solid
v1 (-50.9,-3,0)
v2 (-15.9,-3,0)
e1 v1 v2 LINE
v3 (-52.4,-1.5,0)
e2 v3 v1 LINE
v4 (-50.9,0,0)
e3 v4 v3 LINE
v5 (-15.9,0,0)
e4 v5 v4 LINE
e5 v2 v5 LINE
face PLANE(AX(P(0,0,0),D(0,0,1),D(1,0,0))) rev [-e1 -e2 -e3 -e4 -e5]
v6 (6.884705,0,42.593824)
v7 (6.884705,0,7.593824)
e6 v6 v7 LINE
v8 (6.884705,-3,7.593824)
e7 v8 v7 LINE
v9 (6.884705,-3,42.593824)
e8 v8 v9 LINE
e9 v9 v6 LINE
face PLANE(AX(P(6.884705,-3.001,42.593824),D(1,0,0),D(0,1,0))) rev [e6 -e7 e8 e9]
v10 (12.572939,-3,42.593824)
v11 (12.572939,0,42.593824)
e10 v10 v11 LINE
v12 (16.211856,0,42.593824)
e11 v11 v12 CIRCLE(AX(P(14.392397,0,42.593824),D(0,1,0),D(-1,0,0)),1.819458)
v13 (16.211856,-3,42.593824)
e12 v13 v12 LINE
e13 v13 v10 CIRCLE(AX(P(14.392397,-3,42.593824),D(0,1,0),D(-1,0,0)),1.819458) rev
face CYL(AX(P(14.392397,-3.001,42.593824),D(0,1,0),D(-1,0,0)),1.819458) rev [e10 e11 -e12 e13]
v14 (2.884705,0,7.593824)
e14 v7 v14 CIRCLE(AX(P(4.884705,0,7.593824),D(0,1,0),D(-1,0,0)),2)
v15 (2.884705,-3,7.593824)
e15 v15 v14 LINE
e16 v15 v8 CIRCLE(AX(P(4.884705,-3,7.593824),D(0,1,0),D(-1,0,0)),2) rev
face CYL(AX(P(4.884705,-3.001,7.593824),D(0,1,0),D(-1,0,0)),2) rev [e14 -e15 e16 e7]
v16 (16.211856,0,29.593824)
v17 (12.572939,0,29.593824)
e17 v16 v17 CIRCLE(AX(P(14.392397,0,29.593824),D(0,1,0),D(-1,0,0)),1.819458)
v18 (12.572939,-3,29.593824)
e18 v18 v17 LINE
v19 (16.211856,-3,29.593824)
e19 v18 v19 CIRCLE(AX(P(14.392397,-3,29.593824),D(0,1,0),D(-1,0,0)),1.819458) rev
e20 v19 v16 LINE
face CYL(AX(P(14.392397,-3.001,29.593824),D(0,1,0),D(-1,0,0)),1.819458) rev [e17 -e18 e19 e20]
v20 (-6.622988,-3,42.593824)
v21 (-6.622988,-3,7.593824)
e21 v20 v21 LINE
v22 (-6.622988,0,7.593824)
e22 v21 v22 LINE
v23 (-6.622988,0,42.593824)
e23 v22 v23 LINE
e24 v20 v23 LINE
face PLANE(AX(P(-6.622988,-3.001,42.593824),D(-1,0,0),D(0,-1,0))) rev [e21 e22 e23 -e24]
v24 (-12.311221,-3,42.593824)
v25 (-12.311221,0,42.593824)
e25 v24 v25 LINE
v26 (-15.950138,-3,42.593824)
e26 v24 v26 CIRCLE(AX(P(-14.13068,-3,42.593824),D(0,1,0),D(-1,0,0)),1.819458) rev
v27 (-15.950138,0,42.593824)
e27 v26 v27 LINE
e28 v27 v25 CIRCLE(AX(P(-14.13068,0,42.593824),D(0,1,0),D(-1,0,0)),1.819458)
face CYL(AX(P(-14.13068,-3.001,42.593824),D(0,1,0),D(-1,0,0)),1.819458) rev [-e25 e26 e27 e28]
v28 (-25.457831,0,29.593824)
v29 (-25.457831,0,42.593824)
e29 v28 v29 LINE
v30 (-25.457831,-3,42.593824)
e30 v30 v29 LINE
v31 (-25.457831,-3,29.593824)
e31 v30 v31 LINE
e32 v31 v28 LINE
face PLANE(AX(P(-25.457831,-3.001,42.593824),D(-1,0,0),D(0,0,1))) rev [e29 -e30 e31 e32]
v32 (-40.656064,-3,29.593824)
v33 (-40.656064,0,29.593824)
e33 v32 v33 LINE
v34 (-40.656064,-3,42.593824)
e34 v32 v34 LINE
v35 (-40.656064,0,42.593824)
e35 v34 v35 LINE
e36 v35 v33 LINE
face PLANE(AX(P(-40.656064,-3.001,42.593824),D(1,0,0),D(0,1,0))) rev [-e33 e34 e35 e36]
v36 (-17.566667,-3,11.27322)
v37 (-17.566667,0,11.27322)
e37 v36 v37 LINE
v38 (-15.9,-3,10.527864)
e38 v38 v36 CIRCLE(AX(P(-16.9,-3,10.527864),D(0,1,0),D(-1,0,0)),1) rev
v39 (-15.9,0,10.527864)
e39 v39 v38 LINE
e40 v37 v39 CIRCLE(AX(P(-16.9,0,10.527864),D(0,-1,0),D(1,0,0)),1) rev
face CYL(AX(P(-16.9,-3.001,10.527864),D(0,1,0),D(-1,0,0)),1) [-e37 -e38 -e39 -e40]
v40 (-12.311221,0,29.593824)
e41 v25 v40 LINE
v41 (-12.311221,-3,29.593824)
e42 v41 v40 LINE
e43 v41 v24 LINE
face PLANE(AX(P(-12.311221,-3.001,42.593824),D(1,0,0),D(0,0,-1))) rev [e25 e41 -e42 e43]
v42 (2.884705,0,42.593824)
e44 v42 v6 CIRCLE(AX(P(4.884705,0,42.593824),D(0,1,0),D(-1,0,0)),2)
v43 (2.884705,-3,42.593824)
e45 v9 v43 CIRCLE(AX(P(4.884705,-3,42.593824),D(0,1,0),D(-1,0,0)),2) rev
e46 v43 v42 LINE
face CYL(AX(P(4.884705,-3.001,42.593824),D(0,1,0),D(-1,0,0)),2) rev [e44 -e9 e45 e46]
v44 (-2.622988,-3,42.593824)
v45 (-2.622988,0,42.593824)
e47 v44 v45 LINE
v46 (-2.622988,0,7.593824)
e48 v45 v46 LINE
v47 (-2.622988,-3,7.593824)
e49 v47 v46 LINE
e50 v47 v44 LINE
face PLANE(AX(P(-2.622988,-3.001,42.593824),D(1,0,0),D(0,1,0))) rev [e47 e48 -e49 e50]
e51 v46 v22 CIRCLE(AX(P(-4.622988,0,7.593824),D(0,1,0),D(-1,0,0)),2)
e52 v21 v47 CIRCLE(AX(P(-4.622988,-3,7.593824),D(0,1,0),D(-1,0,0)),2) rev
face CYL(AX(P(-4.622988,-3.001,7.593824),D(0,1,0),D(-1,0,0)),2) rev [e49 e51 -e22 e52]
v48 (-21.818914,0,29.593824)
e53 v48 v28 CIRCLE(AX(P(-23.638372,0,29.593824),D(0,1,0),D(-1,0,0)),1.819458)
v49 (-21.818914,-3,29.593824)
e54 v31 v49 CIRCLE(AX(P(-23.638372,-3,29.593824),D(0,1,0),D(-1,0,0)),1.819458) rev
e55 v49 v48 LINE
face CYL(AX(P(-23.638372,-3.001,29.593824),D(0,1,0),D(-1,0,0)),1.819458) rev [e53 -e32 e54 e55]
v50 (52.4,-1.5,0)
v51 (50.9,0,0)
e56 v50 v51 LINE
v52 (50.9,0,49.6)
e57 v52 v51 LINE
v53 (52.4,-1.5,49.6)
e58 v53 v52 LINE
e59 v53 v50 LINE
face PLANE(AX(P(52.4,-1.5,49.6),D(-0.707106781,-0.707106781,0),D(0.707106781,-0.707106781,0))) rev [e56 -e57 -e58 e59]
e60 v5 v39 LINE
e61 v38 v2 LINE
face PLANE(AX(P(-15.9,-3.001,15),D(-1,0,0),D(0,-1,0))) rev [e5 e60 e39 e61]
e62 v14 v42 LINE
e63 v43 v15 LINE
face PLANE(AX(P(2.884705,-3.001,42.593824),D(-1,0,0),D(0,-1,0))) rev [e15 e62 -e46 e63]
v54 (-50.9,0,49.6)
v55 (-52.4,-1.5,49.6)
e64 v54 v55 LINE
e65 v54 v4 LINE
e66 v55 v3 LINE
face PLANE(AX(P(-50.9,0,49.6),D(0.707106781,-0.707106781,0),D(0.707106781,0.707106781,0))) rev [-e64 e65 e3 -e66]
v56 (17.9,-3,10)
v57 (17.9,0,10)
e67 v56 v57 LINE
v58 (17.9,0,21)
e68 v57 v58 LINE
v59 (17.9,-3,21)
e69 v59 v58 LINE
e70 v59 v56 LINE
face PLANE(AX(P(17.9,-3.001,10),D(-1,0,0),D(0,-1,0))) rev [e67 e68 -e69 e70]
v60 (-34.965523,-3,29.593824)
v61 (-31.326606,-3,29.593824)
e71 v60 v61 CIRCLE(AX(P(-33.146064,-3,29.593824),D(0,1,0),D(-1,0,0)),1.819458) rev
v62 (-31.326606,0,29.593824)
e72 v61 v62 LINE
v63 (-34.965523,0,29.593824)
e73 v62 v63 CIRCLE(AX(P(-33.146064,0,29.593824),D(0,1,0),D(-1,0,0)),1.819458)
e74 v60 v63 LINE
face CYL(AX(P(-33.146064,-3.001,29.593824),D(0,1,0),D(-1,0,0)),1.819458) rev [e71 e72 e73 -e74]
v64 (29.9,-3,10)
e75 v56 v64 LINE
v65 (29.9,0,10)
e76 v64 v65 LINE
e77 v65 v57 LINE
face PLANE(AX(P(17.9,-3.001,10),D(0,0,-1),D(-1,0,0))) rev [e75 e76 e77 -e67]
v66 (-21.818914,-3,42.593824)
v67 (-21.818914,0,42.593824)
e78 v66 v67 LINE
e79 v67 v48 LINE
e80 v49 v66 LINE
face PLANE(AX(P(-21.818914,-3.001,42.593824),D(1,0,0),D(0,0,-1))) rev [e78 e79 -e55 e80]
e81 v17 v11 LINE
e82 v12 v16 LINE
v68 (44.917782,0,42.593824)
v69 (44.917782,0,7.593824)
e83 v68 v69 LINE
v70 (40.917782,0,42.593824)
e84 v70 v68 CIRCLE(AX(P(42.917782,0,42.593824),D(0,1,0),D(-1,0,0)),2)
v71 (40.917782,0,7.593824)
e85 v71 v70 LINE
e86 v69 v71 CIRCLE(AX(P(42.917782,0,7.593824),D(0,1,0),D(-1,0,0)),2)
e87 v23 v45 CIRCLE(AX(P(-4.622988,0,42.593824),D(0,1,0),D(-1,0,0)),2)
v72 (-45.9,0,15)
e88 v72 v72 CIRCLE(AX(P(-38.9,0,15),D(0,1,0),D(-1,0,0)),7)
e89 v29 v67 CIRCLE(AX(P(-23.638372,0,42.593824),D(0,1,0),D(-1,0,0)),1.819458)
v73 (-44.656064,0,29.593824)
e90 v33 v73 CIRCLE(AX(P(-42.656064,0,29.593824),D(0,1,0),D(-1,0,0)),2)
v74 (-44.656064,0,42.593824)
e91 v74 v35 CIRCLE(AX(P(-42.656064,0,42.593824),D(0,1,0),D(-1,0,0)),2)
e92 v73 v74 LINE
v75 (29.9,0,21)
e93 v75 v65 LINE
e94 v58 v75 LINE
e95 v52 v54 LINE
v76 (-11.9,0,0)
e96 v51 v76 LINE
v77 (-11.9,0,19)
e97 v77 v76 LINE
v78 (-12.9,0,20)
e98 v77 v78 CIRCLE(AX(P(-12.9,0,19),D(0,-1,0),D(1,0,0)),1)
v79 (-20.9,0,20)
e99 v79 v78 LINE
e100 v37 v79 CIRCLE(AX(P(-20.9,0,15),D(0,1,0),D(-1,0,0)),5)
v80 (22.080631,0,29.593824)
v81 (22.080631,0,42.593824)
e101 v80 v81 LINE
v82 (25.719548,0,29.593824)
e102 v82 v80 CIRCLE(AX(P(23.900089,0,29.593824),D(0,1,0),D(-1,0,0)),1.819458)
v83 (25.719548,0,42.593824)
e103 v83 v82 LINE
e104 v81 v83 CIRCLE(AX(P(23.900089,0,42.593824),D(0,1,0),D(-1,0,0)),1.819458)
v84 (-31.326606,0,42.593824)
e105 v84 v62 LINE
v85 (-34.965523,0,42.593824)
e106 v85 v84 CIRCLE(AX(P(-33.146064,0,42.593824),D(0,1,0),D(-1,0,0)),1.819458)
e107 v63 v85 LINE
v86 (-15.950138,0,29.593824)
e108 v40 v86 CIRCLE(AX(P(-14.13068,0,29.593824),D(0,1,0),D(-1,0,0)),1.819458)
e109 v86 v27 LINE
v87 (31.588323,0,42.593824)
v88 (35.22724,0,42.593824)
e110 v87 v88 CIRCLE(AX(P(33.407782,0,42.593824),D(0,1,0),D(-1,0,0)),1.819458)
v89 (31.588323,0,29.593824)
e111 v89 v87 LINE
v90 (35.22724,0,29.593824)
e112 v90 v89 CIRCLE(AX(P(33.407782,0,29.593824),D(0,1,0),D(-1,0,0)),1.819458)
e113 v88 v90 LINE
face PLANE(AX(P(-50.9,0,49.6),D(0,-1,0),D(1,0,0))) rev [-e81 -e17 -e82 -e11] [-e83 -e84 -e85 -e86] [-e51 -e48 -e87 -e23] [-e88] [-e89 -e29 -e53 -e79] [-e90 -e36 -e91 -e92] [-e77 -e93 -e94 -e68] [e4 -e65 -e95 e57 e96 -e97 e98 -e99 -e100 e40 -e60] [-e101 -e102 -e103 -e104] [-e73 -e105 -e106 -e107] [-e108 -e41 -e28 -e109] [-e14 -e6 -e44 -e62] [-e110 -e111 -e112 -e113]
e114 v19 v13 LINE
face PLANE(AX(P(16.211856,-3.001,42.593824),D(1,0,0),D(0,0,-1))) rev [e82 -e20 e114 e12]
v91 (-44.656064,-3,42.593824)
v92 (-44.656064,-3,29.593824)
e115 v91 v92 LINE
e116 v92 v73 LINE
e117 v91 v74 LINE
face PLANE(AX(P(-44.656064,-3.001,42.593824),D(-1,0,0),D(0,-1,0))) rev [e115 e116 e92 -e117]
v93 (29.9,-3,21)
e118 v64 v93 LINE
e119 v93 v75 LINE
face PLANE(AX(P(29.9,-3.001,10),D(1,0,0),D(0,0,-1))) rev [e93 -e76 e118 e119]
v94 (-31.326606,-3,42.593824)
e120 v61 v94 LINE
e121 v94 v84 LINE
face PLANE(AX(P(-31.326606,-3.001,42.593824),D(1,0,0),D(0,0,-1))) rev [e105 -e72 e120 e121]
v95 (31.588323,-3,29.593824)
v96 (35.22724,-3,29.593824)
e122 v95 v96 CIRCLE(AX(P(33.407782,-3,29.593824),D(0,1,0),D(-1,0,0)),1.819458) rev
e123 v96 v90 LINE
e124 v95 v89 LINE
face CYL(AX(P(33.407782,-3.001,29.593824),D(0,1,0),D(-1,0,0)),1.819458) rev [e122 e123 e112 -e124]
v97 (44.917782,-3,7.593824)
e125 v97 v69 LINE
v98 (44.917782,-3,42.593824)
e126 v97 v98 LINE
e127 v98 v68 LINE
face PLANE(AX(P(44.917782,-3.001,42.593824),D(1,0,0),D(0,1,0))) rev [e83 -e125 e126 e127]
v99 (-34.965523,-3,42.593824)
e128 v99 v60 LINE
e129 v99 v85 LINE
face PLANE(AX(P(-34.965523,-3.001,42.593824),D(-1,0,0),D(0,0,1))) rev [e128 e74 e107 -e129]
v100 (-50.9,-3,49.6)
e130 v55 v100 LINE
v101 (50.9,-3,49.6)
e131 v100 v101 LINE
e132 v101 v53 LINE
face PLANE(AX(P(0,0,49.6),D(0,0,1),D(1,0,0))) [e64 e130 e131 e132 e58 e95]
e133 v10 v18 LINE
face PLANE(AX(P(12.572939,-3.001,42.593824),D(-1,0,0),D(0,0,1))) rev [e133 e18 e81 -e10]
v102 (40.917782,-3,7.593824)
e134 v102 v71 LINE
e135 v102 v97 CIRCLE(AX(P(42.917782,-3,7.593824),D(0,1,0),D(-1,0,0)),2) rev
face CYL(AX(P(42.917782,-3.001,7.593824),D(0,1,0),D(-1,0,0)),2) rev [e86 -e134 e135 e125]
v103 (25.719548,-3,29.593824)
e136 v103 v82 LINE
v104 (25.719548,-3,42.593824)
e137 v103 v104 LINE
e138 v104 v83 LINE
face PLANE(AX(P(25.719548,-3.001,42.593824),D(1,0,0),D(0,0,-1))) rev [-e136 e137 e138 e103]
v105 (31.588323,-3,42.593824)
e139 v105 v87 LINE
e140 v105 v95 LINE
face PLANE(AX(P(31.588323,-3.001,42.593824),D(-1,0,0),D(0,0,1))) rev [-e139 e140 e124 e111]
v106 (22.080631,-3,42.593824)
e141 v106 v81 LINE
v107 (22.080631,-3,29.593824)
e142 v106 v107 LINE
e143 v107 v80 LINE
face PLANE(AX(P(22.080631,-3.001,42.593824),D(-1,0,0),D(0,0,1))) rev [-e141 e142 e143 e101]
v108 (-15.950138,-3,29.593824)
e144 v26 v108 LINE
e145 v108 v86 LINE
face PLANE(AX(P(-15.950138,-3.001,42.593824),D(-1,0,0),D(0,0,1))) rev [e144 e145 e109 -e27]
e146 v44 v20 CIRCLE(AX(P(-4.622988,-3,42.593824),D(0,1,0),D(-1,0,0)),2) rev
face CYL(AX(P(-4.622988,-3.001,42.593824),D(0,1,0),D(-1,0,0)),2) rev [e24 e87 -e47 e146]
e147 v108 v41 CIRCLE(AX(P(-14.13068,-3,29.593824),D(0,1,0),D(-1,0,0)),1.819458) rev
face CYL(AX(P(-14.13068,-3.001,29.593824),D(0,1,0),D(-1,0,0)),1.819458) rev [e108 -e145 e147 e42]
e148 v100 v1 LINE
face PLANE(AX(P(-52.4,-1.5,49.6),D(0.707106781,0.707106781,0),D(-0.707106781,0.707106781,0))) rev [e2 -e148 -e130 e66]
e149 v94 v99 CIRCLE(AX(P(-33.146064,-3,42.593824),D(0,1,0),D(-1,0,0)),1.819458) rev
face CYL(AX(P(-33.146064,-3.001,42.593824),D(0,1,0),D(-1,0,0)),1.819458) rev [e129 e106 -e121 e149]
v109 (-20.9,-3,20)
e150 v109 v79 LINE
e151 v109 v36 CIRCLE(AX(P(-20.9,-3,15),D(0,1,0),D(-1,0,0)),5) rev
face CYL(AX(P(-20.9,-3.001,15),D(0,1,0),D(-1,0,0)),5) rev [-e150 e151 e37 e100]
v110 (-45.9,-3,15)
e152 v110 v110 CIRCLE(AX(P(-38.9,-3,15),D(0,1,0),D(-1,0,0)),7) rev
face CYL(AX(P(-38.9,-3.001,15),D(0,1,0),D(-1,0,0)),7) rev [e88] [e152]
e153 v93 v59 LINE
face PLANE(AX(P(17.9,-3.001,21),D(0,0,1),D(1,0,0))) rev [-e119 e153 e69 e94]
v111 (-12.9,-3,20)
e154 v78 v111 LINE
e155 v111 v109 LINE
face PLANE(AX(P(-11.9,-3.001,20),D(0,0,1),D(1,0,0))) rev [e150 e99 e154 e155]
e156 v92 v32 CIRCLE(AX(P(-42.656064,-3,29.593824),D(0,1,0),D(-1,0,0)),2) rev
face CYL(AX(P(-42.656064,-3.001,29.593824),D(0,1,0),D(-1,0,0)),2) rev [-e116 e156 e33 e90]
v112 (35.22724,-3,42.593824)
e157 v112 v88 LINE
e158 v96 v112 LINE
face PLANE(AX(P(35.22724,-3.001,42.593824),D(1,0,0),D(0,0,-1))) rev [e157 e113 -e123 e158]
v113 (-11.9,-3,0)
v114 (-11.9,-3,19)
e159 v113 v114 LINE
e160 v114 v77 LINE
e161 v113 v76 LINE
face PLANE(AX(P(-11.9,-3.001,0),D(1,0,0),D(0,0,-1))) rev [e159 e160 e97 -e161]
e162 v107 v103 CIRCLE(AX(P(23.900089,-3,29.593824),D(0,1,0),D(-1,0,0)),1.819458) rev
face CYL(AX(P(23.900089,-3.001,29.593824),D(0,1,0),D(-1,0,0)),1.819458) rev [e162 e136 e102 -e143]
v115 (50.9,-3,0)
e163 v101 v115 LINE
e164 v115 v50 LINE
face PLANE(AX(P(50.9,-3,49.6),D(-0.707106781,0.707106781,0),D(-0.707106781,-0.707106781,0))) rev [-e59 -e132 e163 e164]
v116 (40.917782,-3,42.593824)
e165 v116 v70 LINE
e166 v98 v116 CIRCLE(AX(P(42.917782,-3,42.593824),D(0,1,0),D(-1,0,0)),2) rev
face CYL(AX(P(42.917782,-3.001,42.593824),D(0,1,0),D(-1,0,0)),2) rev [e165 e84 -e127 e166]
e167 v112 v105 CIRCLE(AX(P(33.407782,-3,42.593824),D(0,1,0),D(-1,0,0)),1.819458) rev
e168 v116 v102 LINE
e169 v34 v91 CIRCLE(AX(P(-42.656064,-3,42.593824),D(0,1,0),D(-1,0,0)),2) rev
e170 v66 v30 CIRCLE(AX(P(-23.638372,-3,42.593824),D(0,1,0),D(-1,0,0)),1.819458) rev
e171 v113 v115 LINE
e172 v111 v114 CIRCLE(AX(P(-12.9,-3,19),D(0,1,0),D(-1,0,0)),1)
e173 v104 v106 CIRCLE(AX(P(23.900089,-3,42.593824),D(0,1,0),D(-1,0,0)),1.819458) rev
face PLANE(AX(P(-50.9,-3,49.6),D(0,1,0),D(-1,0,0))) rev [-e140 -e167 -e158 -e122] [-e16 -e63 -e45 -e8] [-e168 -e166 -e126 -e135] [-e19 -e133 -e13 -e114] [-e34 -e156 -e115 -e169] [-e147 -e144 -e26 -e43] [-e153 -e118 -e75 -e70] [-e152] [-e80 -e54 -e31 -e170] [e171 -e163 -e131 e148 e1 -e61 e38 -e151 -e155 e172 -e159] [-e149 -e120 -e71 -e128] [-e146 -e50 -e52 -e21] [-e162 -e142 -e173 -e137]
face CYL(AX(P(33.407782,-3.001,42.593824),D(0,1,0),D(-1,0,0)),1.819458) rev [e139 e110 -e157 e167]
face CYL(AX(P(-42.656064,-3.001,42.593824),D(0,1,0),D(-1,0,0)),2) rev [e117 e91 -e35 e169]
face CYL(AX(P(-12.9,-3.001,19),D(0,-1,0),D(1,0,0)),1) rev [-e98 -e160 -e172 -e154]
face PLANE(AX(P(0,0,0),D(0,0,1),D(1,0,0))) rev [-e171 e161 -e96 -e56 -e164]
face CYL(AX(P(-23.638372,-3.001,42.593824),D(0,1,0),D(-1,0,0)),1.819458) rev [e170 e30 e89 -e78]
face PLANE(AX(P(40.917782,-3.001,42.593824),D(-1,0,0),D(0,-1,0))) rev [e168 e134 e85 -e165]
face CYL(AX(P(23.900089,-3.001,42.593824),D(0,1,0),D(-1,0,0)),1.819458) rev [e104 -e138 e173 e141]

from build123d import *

# Parameters (mm, degrees)
BOSS_EXTRUDE1_DEPTH = 49.6
CUT_EXTRUDE1_REACH  = 74.214
SKETCH5_R           = 7
SKETCH5_W           = 12
SKETCH5_H           = 11
FILLET1_R           = 1


with BuildPart() as part:
    # Sketch4 → Boss-Extrude1 (new body)
    with BuildSketch(Plane.XY):
        Polygon((-50.9, 0), (50.9, 0), (52.4, -1.5), (50.9, -3), (-50.9, -3), (-52.4, -1.5), align=None)
    extrude(amount=BOSS_EXTRUDE1_DEPTH)

    # Sketch5 → Cut-Extrude1 (cut, up to next)
    with BuildSketch(Plane(origin=(0, 0, 0), x_dir=(1, 0, 0), z_dir=(0, 1, 0)), mode=Mode.PRIVATE) as cut_extrude1_sk1:
        with Locations((-38.9, -15)):
            Circle(SKETCH5_R)
    cut_extrude1_tool1 = extrude(cut_extrude1_sk1.sketch, amount=-CUT_EXTRUDE1_REACH, mode=Mode.PRIVATE) & part.part
    # Sketch5 → Cut-Extrude1 (cut, up to next)
    with BuildSketch(Plane(origin=(0, 0, 0), x_dir=(1, 0, 0), z_dir=(0, 1, 0)), mode=Mode.PRIVATE) as cut_extrude1_sk2:
        with Locations((23.9, -15.5)):
            Rectangle(SKETCH5_W, SKETCH5_H)
    cut_extrude1_tool2 = extrude(cut_extrude1_sk2.sketch, amount=-CUT_EXTRUDE1_REACH, mode=Mode.PRIVATE) & part.part
    # Sketch5 → Cut-Extrude1 (cut, up to next)
    with BuildSketch(Plane(origin=(0, 0, 0), x_dir=(1, 0, 0), z_dir=(0, 1, 0)), mode=Mode.PRIVATE) as cut_extrude1_sk3:
        with BuildLine():
            Line((-15.9, -15), (-15.9, 0))
            Line((-15.9, 0), (-11.9, 0))
            Line((-11.9, 0), (-11.9, -20))
            Line((-11.9, -20), (-20.9, -20))
            ThreePointArc((-20.9, -20), (-24.435533906, -11.464466094), (-15.9, -15))
        make_face()
    cut_extrude1_tool3 = extrude(cut_extrude1_sk3.sketch, amount=-CUT_EXTRUDE1_REACH, mode=Mode.PRIVATE) & part.part
    # Sketch5 → Cut-Extrude1 (cut, up to next)
    with BuildSketch(Plane(origin=(0, 0, 0), x_dir=(1, 0, 0), z_dir=(0, 1, 0)), mode=Mode.PRIVATE) as cut_extrude1_sk4:
        with BuildLine():
            Line((-44.656064428, -42.593823795), (-44.656064428, -29.593823795))
            ThreePointArc((-44.656064428, -29.593823795), (-42.656064428, -27.593823795), (-40.656064428, -29.593823795))
            Line((-40.656064428, -29.593823795), (-40.656064428, -42.593823795))
            ThreePointArc((-40.656064428, -42.593823795), (-42.656064428, -44.593823795), (-44.656064428, -42.593823795))
        make_face()
    cut_extrude1_tool4 = extrude(cut_extrude1_sk4.sketch, amount=-CUT_EXTRUDE1_REACH, mode=Mode.PRIVATE) & part.part
    # Sketch5 → Cut-Extrude1 (cut, up to next)
    with BuildSketch(Plane(origin=(0, 0, 0), x_dir=(1, 0, 0), z_dir=(0, 1, 0)), mode=Mode.PRIVATE) as cut_extrude1_sk5:
        with BuildLine():
            Line((40.917781725, -42.593823795), (40.917781725, -7.593823795))
            ThreePointArc((40.917781725, -7.593823795), (42.917781725, -5.593823795), (44.917781725, -7.593823795))
            Line((44.917781725, -7.593823795), (44.917781725, -42.593823795))
            ThreePointArc((44.917781725, -42.593823795), (42.917781725, -44.593823795), (40.917781725, -42.593823795))
        make_face()
    cut_extrude1_tool5 = extrude(cut_extrude1_sk5.sketch, amount=-CUT_EXTRUDE1_REACH, mode=Mode.PRIVATE) & part.part
    # Sketch5 → Cut-Extrude1 (cut, up to next)
    with BuildSketch(Plane(origin=(0, 0, 0), x_dir=(1, 0, 0), z_dir=(0, 1, 0)), mode=Mode.PRIVATE) as cut_extrude1_sk6:
        with BuildLine():
            Line((-34.965522839, -42.593823795), (-34.965522839, -29.593823795))
            ThreePointArc((-34.965522839, -29.593823795), (-33.146064428, -27.774365385), (-31.326606018, -29.593823795))
            Line((-31.326606018, -29.593823795), (-31.326606018, -42.593823795))
            ThreePointArc((-31.326606018, -42.593823795), (-33.146064428, -44.413282206), (-34.965522839, -42.593823795))
        make_face()
    cut_extrude1_tool6 = extrude(cut_extrude1_sk6.sketch, amount=-CUT_EXTRUDE1_REACH, mode=Mode.PRIVATE) & part.part
    # Sketch5 → Cut-Extrude1 (cut, up to next)
    with BuildSketch(Plane(origin=(0, 0, 0), x_dir=(1, 0, 0), z_dir=(0, 1, 0)), mode=Mode.PRIVATE) as cut_extrude1_sk7:
        with BuildLine():
            Line((-25.457830531, -42.593823795), (-25.457830531, -29.593823795))
            ThreePointArc((-25.457830531, -29.593823795), (-23.638372121, -27.774365385), (-21.81891371, -29.593823795))
            Line((-21.81891371, -29.593823795), (-21.81891371, -42.593823795))
            ThreePointArc((-21.81891371, -42.593823795), (-23.638372121, -44.413282206), (-25.457830531, -42.593823795))
        make_face()
    cut_extrude1_tool7 = extrude(cut_extrude1_sk7.sketch, amount=-CUT_EXTRUDE1_REACH, mode=Mode.PRIVATE) & part.part
    # Sketch5 → Cut-Extrude1 (cut, up to next)
    with BuildSketch(Plane(origin=(0, 0, 0), x_dir=(1, 0, 0), z_dir=(0, 1, 0)), mode=Mode.PRIVATE) as cut_extrude1_sk8:
        with BuildLine():
            Line((-15.950138223, -42.593823795), (-15.950138223, -29.593823795))
            ThreePointArc((-15.950138223, -29.593823795), (-14.130679813, -27.774365385), (-12.311221403, -29.593823795))
            Line((-12.311221403, -29.593823795), (-12.311221403, -42.593823795))
            ThreePointArc((-12.311221403, -42.593823795), (-14.130679813, -44.413282206), (-15.950138223, -42.593823795))
        make_face()
    cut_extrude1_tool8 = extrude(cut_extrude1_sk8.sketch, amount=-CUT_EXTRUDE1_REACH, mode=Mode.PRIVATE) & part.part
    # Sketch5 → Cut-Extrude1 (cut, up to next)
    with BuildSketch(Plane(origin=(0, 0, 0), x_dir=(1, 0, 0), z_dir=(0, 1, 0)), mode=Mode.PRIVATE) as cut_extrude1_sk9:
        with BuildLine():
            Line((-6.622987505, -42.593823795), (-6.622987505, -7.593823795))
            ThreePointArc((-6.622987505, -7.593823795), (-4.622987505, -5.593823795), (-2.622987505, -7.593823795))
            Line((-2.622987505, -7.593823795), (-2.622987505, -42.593823795))
            ThreePointArc((-2.622987505, -42.593823795), (-4.622987505, -44.593823795), (-6.622987505, -42.593823795))
        make_face()
    cut_extrude1_tool9 = extrude(cut_extrude1_sk9.sketch, amount=-CUT_EXTRUDE1_REACH, mode=Mode.PRIVATE) & part.part
    # Sketch5 → Cut-Extrude1 (cut, up to next)
    with BuildSketch(Plane(origin=(0, 0, 0), x_dir=(1, 0, 0), z_dir=(0, 1, 0)), mode=Mode.PRIVATE) as cut_extrude1_sk10:
        with BuildLine():
            Line((2.884704802, -42.593823795), (2.884704802, -7.593823795))
            ThreePointArc((2.884704802, -7.593823795), (4.884704802, -5.593823795), (6.884704802, -7.593823795))
            Line((6.884704802, -7.593823795), (6.884704802, -42.593823795))
            ThreePointArc((6.884704802, -42.593823795), (4.884704802, -44.593823795), (2.884704802, -42.593823795))
        make_face()
    cut_extrude1_tool10 = extrude(cut_extrude1_sk10.sketch, amount=-CUT_EXTRUDE1_REACH, mode=Mode.PRIVATE) & part.part
    # Sketch5 → Cut-Extrude1 (cut, up to next)
    with BuildSketch(Plane(origin=(0, 0, 0), x_dir=(1, 0, 0), z_dir=(0, 1, 0)), mode=Mode.PRIVATE) as cut_extrude1_sk11:
        with BuildLine():
            Line((12.5729387, -42.593823795), (12.5729387, -29.593823795))
            ThreePointArc((12.5729387, -29.593823795), (14.39239711, -27.774365385), (16.211855521, -29.593823795))
            Line((16.211855521, -29.593823795), (16.211855521, -42.593823795))
            ThreePointArc((16.211855521, -42.593823795), (14.39239711, -44.413282206), (12.5729387, -42.593823795))
        make_face()
    cut_extrude1_tool11 = extrude(cut_extrude1_sk11.sketch, amount=-CUT_EXTRUDE1_REACH, mode=Mode.PRIVATE) & part.part
    # Sketch5 → Cut-Extrude1 (cut, up to next)
    with BuildSketch(Plane(origin=(0, 0, 0), x_dir=(1, 0, 0), z_dir=(0, 1, 0)), mode=Mode.PRIVATE) as cut_extrude1_sk12:
        with BuildLine():
            Line((22.080631007, -42.593823795), (22.080631007, -29.593823795))
            ThreePointArc((22.080631007, -29.593823795), (23.900089418, -27.774365385), (25.719547828, -29.593823795))
            Line((25.719547828, -29.593823795), (25.719547828, -42.593823795))
            ThreePointArc((25.719547828, -42.593823795), (23.900089418, -44.413282206), (22.080631007, -42.593823795))
        make_face()
    cut_extrude1_tool12 = extrude(cut_extrude1_sk12.sketch, amount=-CUT_EXTRUDE1_REACH, mode=Mode.PRIVATE) & part.part
    # Sketch5 → Cut-Extrude1 (cut, up to next)
    with BuildSketch(Plane(origin=(0, 0, 0), x_dir=(1, 0, 0), z_dir=(0, 1, 0)), mode=Mode.PRIVATE) as cut_extrude1_sk13:
        with BuildLine():
            Line((31.588323315, -42.593823795), (31.588323315, -29.593823795))
            ThreePointArc((31.588323315, -29.593823795), (33.407781725, -27.774365385), (35.227240136, -29.593823795))
            Line((35.227240136, -29.593823795), (35.227240136, -42.593823795))
            ThreePointArc((35.227240136, -42.593823795), (33.407781725, -44.413282206), (31.588323315, -42.593823795))
        make_face()
    cut_extrude1_tool13 = extrude(cut_extrude1_sk13.sketch, amount=-CUT_EXTRUDE1_REACH, mode=Mode.PRIVATE) & part.part
    add(cut_extrude1_tool1.solids().sort_by_distance((-38.9, 0, 15))[0], mode=Mode.SUBTRACT)
    add(cut_extrude1_tool2.solids().sort_by_distance((23.9, 0, 15.5))[0], mode=Mode.SUBTRACT)
    add(cut_extrude1_tool3.solids().sort_by_distance((-17.356278, 0, 12.686666))[0], mode=Mode.SUBTRACT)
    add(cut_extrude1_tool4.solids().sort_by_distance((-42.656064, 0, 36.093824))[0], mode=Mode.SUBTRACT)
    add(cut_extrude1_tool5.solids().sort_by_distance((42.917782, 0, 25.093824))[0], mode=Mode.SUBTRACT)
    add(cut_extrude1_tool6.solids().sort_by_distance((-33.146064, 0, 36.093824))[0], mode=Mode.SUBTRACT)
    add(cut_extrude1_tool7.solids().sort_by_distance((-23.638372, 0, 36.093824))[0], mode=Mode.SUBTRACT)
    add(cut_extrude1_tool8.solids().sort_by_distance((-14.13068, 0, 36.093824))[0], mode=Mode.SUBTRACT)
    add(cut_extrude1_tool9.solids().sort_by_distance((-4.622988, 0, 25.093824))[0], mode=Mode.SUBTRACT)
    add(cut_extrude1_tool10.solids().sort_by_distance((4.884705, 0, 25.093824))[0], mode=Mode.SUBTRACT)
    add(cut_extrude1_tool11.solids().sort_by_distance((14.392397, 0, 36.093824))[0], mode=Mode.SUBTRACT)
    add(cut_extrude1_tool12.solids().sort_by_distance((23.900089, 0, 36.093824))[0], mode=Mode.SUBTRACT)
    add(cut_extrude1_tool13.solids().sort_by_distance((33.407782, 0, 36.093824))[0], mode=Mode.SUBTRACT)

    # Fillet1
    fillet1_edges = [part.edges().sort_by_distance(p)[0] for p in [
        (-11.9, -1.5, 20),
    ]]
    fillet(fillet1_edges, radius=FILLET1_R)
    fillet1_2_edges = [part.edges().sort_by_distance(p)[0] for p in [
        (-15.9, -1.5, 15),
    ]]
    fillet(fillet1_2_edges, radius=FILLET1_R)


solid = part.part
